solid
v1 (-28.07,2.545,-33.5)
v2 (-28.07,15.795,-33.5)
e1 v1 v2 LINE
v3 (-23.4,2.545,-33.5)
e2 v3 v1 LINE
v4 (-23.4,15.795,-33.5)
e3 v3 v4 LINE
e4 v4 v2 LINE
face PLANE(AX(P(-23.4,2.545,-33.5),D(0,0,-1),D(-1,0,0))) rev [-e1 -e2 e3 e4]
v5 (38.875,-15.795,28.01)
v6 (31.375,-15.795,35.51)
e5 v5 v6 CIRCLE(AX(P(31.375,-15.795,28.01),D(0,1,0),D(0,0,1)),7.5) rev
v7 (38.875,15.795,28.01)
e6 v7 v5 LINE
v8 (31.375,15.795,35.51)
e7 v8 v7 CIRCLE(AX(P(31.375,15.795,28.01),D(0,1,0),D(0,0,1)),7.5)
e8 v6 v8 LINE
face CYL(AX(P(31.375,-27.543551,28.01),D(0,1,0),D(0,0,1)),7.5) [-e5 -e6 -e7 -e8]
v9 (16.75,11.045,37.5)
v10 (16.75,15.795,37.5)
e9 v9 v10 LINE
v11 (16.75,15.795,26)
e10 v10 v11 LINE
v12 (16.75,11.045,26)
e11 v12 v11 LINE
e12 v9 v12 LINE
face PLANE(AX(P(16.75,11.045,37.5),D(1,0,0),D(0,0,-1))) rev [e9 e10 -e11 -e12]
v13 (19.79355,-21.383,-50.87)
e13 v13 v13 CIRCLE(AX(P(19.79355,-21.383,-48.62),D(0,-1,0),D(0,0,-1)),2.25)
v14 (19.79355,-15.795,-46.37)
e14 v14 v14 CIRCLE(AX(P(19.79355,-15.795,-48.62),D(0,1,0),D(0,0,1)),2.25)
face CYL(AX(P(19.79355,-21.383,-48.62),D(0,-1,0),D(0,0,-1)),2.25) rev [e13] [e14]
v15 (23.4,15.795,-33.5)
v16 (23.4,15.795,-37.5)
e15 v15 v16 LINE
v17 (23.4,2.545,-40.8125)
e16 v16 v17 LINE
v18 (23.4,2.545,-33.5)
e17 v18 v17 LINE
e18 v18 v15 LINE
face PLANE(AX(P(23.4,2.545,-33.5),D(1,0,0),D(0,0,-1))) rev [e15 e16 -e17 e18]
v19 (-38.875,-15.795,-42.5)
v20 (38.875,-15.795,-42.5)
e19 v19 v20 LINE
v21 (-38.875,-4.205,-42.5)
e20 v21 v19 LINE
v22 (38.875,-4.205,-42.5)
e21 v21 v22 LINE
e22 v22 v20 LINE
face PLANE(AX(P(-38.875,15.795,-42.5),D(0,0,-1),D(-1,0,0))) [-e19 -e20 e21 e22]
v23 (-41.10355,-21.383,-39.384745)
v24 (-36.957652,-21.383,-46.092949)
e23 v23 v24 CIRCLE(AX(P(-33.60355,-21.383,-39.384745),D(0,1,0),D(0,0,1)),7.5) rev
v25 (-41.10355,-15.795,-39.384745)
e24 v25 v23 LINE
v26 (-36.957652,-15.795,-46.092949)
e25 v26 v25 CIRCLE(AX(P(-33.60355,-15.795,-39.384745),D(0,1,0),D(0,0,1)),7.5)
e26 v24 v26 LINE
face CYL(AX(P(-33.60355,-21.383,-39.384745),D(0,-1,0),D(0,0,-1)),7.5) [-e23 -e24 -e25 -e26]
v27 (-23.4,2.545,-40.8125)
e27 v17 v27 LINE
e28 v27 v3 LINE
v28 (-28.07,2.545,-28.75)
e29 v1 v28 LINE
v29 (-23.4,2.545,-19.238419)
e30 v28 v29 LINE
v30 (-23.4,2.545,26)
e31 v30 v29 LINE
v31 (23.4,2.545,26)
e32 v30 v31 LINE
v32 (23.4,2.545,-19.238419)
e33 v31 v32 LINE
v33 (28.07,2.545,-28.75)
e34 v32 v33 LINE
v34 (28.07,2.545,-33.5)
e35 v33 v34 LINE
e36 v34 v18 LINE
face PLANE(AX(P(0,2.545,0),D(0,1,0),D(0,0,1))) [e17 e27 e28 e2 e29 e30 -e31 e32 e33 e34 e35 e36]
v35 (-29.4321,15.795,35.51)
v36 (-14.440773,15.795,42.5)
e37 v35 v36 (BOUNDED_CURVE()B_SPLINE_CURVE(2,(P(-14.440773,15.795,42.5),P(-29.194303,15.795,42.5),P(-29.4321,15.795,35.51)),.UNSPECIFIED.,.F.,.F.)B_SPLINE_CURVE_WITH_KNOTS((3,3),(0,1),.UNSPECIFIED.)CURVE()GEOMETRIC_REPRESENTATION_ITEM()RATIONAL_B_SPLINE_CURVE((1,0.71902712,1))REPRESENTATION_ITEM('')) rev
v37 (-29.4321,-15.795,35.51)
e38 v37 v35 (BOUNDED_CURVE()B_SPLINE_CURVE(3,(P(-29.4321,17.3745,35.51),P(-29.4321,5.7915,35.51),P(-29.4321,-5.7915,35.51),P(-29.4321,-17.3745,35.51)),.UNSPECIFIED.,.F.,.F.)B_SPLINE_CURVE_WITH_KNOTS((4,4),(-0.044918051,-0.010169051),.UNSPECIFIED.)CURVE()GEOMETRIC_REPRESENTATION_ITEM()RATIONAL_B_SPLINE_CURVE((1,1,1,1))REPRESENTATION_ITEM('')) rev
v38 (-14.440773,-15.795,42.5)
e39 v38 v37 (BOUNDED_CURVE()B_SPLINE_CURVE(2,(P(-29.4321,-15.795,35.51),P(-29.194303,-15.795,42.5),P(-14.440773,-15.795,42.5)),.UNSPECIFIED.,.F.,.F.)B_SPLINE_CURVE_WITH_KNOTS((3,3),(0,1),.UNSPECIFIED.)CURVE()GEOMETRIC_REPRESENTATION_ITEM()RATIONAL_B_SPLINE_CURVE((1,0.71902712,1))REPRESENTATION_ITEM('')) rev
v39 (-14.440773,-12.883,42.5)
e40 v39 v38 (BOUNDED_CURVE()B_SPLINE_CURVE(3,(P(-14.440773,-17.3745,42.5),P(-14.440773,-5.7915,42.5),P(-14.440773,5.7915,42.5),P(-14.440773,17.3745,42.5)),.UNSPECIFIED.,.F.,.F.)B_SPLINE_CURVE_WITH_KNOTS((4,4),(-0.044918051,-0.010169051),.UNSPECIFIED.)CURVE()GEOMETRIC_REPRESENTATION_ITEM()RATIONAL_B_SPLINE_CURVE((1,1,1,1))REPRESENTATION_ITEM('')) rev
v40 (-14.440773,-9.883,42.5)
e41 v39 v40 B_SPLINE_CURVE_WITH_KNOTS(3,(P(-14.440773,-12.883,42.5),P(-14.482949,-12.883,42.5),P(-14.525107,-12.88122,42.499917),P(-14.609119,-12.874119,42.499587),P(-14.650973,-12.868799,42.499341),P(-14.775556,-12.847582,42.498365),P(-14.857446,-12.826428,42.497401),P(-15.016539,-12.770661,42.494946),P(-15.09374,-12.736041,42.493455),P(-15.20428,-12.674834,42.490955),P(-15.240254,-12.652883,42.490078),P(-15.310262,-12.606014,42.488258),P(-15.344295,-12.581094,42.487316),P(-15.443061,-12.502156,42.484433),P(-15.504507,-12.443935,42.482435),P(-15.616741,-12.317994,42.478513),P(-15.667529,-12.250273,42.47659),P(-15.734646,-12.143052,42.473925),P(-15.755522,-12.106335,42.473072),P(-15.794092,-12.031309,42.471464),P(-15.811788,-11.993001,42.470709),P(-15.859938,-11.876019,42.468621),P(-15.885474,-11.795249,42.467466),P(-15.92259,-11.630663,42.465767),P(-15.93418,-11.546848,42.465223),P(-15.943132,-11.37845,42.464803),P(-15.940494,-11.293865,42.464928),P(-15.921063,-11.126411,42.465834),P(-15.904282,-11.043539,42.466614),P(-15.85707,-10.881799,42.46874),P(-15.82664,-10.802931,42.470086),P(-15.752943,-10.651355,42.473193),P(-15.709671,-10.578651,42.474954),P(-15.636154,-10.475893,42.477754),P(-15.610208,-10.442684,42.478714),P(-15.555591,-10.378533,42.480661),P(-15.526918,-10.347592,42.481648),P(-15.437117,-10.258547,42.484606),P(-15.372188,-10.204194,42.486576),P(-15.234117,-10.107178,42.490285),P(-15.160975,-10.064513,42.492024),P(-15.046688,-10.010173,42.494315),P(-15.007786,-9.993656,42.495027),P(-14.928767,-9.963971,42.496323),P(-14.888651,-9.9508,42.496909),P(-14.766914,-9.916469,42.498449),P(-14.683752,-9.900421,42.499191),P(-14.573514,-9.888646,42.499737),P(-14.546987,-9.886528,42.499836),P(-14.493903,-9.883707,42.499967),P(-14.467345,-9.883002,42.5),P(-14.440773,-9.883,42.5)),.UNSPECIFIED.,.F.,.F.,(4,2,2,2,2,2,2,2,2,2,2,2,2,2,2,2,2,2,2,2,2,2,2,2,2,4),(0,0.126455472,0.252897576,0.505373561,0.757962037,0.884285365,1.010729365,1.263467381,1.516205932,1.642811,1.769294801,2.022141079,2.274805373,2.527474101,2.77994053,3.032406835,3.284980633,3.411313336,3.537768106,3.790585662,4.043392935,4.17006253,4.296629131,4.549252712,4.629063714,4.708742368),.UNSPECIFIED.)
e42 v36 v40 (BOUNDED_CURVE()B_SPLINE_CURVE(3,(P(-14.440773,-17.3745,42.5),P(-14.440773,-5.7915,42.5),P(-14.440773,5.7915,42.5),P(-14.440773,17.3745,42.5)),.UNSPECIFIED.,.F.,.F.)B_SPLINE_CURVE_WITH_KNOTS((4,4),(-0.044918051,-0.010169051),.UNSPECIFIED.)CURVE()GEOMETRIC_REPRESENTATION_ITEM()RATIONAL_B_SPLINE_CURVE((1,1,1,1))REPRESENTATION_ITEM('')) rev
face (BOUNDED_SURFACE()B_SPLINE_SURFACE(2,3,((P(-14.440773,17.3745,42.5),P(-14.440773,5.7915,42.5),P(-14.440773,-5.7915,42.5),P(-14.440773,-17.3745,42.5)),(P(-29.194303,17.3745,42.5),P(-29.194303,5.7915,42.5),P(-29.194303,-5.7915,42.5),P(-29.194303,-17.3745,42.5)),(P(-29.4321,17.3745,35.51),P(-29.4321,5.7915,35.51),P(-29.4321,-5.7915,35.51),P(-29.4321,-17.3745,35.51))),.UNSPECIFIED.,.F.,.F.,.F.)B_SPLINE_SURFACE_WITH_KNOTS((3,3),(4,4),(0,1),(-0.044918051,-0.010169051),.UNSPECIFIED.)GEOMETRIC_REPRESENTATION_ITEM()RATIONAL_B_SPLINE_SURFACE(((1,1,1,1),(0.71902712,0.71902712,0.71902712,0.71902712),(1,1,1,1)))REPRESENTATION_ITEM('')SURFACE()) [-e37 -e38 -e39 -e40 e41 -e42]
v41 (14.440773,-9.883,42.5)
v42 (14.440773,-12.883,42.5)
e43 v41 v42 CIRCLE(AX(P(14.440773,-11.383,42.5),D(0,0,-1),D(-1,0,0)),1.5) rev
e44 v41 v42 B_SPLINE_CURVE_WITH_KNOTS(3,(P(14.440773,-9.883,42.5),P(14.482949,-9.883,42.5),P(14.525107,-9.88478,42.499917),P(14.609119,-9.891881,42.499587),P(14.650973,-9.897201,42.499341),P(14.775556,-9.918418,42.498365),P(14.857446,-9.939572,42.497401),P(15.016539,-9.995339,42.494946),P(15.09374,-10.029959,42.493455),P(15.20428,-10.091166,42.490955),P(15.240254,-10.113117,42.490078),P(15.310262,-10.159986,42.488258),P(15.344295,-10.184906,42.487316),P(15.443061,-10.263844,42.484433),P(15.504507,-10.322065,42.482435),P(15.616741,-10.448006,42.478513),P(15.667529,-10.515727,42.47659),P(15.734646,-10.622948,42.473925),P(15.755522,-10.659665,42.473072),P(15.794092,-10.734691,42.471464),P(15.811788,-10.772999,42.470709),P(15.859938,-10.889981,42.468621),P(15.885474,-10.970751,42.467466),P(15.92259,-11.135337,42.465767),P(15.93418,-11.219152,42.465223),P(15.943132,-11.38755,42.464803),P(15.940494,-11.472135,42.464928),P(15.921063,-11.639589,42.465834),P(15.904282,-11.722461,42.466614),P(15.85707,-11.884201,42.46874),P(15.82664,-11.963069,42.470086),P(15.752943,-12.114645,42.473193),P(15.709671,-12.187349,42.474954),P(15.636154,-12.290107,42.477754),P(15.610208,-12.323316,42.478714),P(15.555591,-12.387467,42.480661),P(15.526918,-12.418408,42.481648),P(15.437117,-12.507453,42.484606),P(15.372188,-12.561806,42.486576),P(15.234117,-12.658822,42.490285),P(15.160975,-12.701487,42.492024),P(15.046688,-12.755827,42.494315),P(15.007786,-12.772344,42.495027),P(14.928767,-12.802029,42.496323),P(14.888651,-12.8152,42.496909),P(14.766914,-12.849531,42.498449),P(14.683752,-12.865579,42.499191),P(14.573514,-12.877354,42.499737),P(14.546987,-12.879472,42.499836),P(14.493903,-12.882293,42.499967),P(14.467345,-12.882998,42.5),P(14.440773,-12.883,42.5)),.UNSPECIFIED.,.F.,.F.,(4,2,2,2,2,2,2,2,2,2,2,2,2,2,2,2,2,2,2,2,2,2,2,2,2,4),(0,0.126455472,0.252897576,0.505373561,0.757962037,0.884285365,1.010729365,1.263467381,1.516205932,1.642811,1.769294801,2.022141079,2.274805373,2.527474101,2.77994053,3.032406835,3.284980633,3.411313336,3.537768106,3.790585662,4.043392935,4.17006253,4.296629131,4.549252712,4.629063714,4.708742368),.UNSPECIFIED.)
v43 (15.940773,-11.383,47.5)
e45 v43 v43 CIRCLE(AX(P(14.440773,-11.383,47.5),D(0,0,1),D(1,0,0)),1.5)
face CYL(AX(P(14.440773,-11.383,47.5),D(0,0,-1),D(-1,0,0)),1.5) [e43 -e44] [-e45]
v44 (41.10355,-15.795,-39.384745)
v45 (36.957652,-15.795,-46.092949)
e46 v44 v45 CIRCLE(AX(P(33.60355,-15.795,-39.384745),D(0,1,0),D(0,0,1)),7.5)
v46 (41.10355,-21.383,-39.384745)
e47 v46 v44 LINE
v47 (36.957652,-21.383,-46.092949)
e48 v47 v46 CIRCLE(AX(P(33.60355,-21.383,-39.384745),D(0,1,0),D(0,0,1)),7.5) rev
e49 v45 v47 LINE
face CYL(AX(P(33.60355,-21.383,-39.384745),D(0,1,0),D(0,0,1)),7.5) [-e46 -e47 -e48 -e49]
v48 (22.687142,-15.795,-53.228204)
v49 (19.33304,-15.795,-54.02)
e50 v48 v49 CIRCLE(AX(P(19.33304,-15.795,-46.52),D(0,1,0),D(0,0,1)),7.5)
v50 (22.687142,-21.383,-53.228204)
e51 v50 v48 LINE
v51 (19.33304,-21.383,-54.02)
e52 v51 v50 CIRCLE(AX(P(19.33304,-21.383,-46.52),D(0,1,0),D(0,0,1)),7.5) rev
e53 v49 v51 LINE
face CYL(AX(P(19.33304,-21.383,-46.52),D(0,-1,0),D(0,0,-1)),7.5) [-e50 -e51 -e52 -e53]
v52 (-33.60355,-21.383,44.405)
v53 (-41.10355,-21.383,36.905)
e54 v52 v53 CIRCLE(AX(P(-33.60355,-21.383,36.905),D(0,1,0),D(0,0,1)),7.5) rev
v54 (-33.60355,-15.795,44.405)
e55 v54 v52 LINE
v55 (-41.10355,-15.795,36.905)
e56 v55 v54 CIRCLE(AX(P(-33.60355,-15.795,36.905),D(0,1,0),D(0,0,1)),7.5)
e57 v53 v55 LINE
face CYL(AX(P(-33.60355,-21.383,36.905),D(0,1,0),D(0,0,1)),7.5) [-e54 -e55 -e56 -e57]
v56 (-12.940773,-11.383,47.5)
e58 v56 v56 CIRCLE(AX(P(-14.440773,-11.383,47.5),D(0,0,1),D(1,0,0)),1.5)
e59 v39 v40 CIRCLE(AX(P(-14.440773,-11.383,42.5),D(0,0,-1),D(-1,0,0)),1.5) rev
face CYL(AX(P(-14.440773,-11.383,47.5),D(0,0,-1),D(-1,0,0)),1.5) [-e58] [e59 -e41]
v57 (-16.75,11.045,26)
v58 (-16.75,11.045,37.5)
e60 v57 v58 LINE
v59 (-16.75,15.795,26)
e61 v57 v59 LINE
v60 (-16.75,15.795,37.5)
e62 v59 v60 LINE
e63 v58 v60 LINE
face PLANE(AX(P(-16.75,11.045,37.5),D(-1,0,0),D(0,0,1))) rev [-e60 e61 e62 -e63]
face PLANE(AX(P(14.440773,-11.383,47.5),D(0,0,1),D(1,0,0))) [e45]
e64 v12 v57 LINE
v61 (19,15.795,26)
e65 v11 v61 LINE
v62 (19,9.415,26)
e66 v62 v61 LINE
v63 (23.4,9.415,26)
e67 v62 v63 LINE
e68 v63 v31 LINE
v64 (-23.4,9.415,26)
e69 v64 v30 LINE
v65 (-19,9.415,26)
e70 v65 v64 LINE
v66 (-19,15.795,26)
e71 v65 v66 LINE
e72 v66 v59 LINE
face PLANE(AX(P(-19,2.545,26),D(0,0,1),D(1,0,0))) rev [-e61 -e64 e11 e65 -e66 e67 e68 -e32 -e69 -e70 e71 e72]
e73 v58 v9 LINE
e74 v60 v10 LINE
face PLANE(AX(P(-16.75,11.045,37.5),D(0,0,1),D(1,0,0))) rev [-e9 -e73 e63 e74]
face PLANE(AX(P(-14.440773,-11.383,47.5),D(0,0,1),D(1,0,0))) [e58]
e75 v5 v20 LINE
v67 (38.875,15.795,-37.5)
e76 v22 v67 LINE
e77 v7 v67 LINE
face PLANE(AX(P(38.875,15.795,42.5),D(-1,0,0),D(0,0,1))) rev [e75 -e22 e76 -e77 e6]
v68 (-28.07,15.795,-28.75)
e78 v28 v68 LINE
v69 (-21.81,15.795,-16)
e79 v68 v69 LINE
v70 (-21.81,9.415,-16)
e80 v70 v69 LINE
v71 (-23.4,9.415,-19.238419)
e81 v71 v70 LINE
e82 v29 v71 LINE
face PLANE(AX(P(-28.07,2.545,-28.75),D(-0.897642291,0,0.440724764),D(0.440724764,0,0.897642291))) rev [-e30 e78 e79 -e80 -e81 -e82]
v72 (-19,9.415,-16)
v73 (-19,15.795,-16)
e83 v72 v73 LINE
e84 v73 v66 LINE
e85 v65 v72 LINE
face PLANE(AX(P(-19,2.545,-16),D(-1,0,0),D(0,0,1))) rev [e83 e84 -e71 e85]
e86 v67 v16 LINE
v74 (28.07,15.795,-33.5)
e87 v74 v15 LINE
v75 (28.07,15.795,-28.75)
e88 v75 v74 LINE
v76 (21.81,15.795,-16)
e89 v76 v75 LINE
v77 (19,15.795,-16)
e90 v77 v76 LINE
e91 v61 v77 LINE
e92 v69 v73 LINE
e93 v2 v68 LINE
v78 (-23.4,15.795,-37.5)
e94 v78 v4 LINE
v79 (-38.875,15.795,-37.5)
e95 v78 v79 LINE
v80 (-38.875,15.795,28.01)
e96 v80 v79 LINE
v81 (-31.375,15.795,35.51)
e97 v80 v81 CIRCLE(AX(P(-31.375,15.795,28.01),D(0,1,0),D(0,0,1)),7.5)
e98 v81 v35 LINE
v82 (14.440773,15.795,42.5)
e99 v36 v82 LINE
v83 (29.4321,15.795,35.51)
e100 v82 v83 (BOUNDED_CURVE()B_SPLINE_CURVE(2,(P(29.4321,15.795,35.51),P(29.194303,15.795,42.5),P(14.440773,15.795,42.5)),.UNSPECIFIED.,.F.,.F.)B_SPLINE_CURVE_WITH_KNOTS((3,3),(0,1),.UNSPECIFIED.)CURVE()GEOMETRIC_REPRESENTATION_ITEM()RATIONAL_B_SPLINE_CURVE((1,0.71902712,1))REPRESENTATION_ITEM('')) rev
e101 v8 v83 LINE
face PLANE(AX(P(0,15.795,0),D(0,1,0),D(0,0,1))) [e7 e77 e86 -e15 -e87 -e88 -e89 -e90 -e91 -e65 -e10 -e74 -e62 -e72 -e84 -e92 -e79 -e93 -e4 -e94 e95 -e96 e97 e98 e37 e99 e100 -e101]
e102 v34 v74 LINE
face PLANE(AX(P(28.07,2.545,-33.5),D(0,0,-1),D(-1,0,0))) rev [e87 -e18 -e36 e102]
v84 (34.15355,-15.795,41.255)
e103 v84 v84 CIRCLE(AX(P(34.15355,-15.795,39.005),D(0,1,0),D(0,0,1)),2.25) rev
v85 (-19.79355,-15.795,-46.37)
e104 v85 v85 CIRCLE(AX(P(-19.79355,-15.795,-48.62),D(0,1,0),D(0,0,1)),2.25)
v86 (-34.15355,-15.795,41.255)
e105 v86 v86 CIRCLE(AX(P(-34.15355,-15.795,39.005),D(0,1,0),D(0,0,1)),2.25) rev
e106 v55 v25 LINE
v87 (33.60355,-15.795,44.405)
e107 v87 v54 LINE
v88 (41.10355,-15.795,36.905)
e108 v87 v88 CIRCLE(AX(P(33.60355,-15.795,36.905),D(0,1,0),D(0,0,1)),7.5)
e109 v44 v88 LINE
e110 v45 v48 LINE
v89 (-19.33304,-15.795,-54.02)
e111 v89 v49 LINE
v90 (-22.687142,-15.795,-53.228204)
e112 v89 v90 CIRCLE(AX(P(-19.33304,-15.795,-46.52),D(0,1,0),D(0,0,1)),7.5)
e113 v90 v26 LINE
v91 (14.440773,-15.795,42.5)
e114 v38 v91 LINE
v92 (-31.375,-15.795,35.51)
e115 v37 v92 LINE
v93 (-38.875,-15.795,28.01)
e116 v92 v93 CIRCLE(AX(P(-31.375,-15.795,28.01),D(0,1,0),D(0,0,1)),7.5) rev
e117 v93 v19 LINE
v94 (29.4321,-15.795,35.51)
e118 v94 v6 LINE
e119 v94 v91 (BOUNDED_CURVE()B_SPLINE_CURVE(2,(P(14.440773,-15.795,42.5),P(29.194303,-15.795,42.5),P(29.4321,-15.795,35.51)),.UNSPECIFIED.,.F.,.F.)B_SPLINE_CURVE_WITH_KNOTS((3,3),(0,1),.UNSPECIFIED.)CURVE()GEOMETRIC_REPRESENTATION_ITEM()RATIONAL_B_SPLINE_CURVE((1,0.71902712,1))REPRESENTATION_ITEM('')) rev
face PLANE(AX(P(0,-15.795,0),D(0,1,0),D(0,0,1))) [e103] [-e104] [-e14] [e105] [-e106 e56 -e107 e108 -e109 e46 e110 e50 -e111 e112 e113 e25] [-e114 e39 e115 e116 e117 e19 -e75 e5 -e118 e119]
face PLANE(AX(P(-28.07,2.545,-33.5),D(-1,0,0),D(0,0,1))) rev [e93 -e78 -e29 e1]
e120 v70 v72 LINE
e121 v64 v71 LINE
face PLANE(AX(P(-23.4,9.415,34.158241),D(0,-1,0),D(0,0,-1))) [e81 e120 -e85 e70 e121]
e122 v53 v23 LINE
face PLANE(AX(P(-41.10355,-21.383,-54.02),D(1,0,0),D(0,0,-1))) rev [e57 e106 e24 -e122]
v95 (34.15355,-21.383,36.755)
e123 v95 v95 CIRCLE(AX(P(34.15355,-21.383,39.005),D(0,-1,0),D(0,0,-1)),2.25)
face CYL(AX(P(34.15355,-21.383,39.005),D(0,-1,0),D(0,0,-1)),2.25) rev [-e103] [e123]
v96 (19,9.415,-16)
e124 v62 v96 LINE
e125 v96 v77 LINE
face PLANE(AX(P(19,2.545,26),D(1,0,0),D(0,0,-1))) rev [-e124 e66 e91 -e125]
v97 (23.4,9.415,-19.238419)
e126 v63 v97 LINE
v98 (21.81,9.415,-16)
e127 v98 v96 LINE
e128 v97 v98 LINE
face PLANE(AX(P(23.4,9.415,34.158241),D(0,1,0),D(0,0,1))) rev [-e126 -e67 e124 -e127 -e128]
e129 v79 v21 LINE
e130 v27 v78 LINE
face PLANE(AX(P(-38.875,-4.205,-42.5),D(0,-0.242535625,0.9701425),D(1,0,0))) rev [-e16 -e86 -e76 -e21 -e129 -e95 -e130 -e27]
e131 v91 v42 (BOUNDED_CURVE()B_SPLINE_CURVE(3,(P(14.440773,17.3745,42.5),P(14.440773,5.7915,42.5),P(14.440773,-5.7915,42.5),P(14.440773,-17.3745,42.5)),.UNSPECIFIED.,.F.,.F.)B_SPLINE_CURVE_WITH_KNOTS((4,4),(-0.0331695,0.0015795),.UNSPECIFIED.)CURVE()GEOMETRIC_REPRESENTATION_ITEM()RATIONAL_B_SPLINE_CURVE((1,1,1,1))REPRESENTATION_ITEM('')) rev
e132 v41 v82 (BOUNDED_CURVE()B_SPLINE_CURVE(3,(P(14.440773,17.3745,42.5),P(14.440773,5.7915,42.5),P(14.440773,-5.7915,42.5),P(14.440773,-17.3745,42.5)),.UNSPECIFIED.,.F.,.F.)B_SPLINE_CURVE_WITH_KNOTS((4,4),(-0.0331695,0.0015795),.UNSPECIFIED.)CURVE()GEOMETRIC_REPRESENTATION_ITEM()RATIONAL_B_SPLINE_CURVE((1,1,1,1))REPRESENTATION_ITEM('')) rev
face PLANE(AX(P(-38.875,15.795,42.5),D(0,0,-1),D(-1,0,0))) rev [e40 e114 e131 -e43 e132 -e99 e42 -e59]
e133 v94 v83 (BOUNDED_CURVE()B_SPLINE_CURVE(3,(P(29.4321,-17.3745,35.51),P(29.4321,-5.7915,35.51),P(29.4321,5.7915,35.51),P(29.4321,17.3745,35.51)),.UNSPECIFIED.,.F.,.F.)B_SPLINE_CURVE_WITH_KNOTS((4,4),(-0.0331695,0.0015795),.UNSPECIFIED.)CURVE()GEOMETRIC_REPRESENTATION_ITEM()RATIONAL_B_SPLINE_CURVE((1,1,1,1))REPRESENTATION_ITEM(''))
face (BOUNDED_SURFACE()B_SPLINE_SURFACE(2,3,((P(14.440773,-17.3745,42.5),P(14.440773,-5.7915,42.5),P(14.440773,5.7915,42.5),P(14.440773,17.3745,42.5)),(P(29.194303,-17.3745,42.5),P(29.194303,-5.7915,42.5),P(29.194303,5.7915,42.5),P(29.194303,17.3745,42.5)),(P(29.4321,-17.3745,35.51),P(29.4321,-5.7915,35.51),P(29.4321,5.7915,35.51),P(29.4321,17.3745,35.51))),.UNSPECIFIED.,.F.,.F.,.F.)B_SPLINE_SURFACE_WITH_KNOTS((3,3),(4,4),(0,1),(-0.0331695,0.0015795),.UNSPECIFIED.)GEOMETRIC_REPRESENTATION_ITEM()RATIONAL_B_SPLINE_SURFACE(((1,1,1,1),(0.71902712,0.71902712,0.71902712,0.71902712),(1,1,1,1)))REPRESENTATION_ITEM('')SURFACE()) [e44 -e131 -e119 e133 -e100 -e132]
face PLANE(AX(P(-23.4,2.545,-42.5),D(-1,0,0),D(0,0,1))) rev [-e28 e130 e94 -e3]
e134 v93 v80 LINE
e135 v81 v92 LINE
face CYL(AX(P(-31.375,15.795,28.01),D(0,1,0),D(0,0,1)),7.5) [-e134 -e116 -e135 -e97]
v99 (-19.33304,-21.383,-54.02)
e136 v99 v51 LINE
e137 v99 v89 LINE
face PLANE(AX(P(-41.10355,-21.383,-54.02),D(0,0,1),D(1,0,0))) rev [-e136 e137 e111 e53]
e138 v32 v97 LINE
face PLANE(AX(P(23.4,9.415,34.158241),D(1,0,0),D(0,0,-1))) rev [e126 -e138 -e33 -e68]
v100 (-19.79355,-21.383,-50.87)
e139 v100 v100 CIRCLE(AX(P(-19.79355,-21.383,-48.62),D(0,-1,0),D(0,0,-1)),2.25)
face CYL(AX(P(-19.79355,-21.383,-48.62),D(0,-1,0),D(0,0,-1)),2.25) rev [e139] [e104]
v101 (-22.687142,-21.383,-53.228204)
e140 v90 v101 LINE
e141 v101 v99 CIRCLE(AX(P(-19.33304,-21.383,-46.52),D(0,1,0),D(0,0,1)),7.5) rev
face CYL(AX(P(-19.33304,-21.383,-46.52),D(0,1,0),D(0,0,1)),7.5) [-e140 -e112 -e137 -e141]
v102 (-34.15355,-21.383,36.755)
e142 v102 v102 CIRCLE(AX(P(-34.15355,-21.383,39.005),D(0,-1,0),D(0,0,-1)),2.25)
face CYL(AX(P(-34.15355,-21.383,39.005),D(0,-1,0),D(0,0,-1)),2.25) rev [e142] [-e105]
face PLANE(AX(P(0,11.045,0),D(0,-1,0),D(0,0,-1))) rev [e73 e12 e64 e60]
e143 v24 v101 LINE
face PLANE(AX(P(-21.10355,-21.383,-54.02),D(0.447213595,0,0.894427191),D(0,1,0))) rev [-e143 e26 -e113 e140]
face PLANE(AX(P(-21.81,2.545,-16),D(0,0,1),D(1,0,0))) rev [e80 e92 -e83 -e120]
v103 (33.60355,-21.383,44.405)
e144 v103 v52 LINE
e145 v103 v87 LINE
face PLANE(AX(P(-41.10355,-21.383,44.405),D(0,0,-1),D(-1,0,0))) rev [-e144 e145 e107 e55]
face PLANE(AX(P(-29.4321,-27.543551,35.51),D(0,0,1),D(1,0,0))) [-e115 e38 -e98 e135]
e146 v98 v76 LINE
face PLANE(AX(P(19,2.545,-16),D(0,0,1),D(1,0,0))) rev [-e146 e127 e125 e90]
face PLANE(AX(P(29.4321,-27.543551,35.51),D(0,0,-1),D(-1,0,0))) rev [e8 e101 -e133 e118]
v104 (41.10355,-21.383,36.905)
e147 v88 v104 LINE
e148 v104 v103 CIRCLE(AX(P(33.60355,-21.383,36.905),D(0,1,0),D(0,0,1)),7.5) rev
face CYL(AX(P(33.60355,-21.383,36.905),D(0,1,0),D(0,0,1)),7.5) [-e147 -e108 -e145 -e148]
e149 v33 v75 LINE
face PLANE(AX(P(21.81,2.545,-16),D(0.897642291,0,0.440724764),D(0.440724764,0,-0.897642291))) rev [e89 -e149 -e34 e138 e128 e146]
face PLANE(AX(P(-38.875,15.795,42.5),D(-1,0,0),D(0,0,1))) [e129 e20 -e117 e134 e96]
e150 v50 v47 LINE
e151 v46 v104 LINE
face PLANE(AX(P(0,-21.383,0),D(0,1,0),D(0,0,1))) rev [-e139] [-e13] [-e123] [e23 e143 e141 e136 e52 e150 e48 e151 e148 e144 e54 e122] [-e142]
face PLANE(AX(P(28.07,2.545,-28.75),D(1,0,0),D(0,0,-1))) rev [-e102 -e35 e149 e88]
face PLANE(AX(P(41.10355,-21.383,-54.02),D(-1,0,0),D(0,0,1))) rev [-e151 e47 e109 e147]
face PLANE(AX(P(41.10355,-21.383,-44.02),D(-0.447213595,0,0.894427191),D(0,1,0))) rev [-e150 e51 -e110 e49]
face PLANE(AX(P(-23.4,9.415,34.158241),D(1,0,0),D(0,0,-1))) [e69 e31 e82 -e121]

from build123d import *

# Parameters (mm, degrees)
SKETCH1_W            = 77.75
SKETCH1_H            = 85
BOSS_EXTRUDE1_DEPTH  = 15.795
SKETCH2_W            = 82.2071
SKETCH2_H            = 98.425
BOSS_EXTRUDE2_DEPTH  = 5.588
M4_CLEARANCE_HOLE1_D = 4.5
CHAMFER1_SIZE        = 20
CHAMFER1_SIZE2       = 10
CHAMFER2_SIZE        = 10
CHAMFER2_SIZE2       = 20
CUT_EXTRUDE1_DEPTH   = 13.25
SKETCH7_W            = 4.4
SKETCH7_H            = 6.87
CUT_EXTRUDE2_DEPTH   = 68.5
SKETCH9_W            = 33.5
SKETCH9_H            = 11.5
CUT_EXTRUDE3_DEPTH   = 4.75
SKETCH10_W           = 9.4429
SKETCH10_H           = 6.99
CUT_EXTRUDE4_DEPTH   = 31.59
FILLET1_R            = 7.5
FILLET2_START        = -15.795
FILLET2_DEPTH        = 32.795
FILLET3_START        = -15.795
FILLET3_DEPTH        = 32.795
CHAMFER3_SIZE        = 5
CHAMFER3_SIZE2       = 20
SKETCH11_R           = 1.5
BOSS_EXTRUDE3_DEPTH  = 5


with BuildPart() as part:
    # Sketch1 → Boss-Extrude1 (new, symmetric)
    with BuildSketch(Plane(origin=(0, 0, 0), x_dir=(1, 0, 0), z_dir=(0, 1, 0))):
        Rectangle(SKETCH1_W, SKETCH1_H)
    extrude(amount=BOSS_EXTRUDE1_DEPTH, both=True)

    # Sketch2 → Boss-Extrude2 (add)
    with BuildSketch(Plane.XZ.offset(15.795)):
        with Locations((0, -4.8075)):
            Rectangle(SKETCH2_W, SKETCH2_H)
    extrude(amount=BOSS_EXTRUDE2_DEPTH)

    # M4 Clearance Hole1 (through all)
    with Locations(Plane(origin=(0, -21.383, 0), x_dir=(-1, 0, 0), z_dir=(0, -1, 0))):
        with Locations((-19.79355, 48.62), (19.79355, 48.62), (34.15355, -39.005), (-34.15355, -39.005)):
            Hole(M4_CLEARANCE_HOLE1_D / 2)

    # Chamfer1
    chamfer1_edges = [part.edges().sort_by_distance(p)[0] for p in [
        (41.10355, -18.589, -54.02),
    ]]
    chamfer1_side = [part.faces().sort_by_distance(p)[0] for p in [
        (0, -18.589, -54.02),
    ]]
    chamfer(chamfer1_edges, length=CHAMFER1_SIZE, length2=CHAMFER1_SIZE2, reference=chamfer1_side[0])

    # Chamfer2
    chamfer2_edges = [part.edges().sort_by_distance(p)[0] for p in [
        (-41.10355, -18.589, -54.02),
    ]]
    chamfer2_side = [part.faces().sort_by_distance(p)[0] for p in [
        (-41.10355, -18.589, -4.8075),
    ]]
    chamfer(chamfer2_edges, length=CHAMFER2_SIZE, length2=CHAMFER2_SIZE2, reference=chamfer2_side[0])

    # Sketch6 → Cut-Extrude1 (cut)
    with BuildSketch(Plane(origin=(0, 15.795, 0), x_dir=(1, 0, 0), z_dir=(0, 1, 0))):
        Polygon((-23.4, 42.5), (-23.4, 33.5), (-28.07, 33.5), (-28.07, 28.75), (-21.81, 16), (-19, 16), (-19, -26), (19, -26), (19, 16), (21.81, 16), (28.07, 28.75), (28.07, 33.5), (23.4, 33.5), (23.4, 42.5), align=None)
    extrude(amount=-CUT_EXTRUDE1_DEPTH, mode=Mode.SUBTRACT)

    # Sketch7 → Cut-Extrude2 (cut)
    with BuildSketch(Plane(origin=(0, 0, -42.5), x_dir=(-1, 0, 0), z_dir=(0, 0, -1))):
        with Locations((-21.2, 5.98)):
            Rectangle(SKETCH7_W, SKETCH7_H)
    cut_extrude2 = extrude(amount=-CUT_EXTRUDE2_DEPTH, mode=Mode.SUBTRACT)

    # Mirror7: Cut-Extrude2 across plane
    add(cut_extrude2.mirror(Plane(origin=(0, 0, 0), x_dir=(0, 0, 1), z_dir=(1, 0, 0))), mode=Mode.SUBTRACT)

    # Sketch9 → Cut-Extrude3 (cut)
    with BuildSketch(Plane(origin=(0, 15.795, 0), x_dir=(1, 0, 0), z_dir=(0, 1, 0))):
        with Locations((0, -31.75)):
            Rectangle(SKETCH9_W, SKETCH9_H)
    extrude(amount=-CUT_EXTRUDE3_DEPTH, mode=Mode.SUBTRACT)

    # Sketch10 → Cut-Extrude4 (cut)
    with BuildSketch(Plane(origin=(0, 15.795, 0), x_dir=(1, 0, 0), z_dir=(0, 1, 0))):
        with Locations((34.15355, -39.005)):
            Rectangle(SKETCH10_W, SKETCH10_H)
    cut_extrude4 = extrude(amount=-CUT_EXTRUDE4_DEPTH, mode=Mode.SUBTRACT)

    # Mirror8: Cut-Extrude4 across plane
    add(cut_extrude4.mirror(Plane(origin=(0, 0, 0), x_dir=(0, 0, 1), z_dir=(1, 0, 0))), mode=Mode.SUBTRACT)

    # Fillet1
    fillet1_edges = [part.edges().sort_by_distance(p)[0] for p in [
        (41.10355, -18.589, 44.405),
        (-41.10355, -18.589, 44.405),
        (38.875, 0, 35.51),
        (-38.875, 0, 35.51),
        (41.10355, -18.589, -44.02),
        (21.10355, -18.589, -54.02),
        (-21.10355, -18.589, -54.02),
        (-41.10355, -18.589, -44.02),
    ]]
    fillet(fillet1_edges, radius=FILLET1_R)

    # Fillet2: read off the stored shape, not the designer's step
    # Fillet2 outline → Fillet2 (cut)
    with BuildSketch(Plane(origin=(0, 0, 0), x_dir=(1, 0, 0), z_dir=(0, 1, 0)).offset(FILLET2_START)):
        with BuildLine():
            Line((-29.4321, -42.5), (-14.440772507, -42.5))
            add(Edge.make_bspline(
                [(-14.440772507, -42.5), (-29.194302513, -42.5), (-29.4321, -35.51)],
                knots=[0, 0, 0, 1, 1, 1], degree=2, weights=[1, 0.71902712, 1]))
            Line((-29.4321, -35.51), (-29.4321, -42.5))
        make_face()
    extrude(amount=FILLET2_DEPTH, mode=Mode.SUBTRACT)

    # Fillet3: read off the stored shape, not the designer's step
    # Fillet3 outline → Fillet3 (cut)
    with BuildSketch(Plane(origin=(0, 0, 0), x_dir=(1, 0, 0), z_dir=(0, 1, 0)).offset(FILLET3_START)):
        with BuildLine():
            add(Edge.make_bspline(
                [(14.440772507, -42.5), (29.194302513, -42.5), (29.4321, -35.51)],
                knots=[0, 0, 0, 1, 1, 1], degree=2, weights=[1, 0.71902712, 1]))
            Line((14.440772507, -42.5), (29.4321, -42.5))
            Line((29.4321, -42.5), (29.4321, -35.51))
        make_face()
    extrude(amount=FILLET3_DEPTH, mode=Mode.SUBTRACT)

    # Chamfer3
    chamfer3_edges = [part.edges().sort_by_distance(p)[0] for p in [
        (-31.1375, 15.795, -42.5),
    ]]
    chamfer3_side = [part.faces().sort_by_distance(p)[0] for p in [
        (30.40355, 15.795, 34.358042424),
    ]]
    chamfer(chamfer3_edges, length=CHAMFER3_SIZE, length2=CHAMFER3_SIZE2, reference=chamfer3_side[0])

    # Sketch11 → Boss-Extrude3 (add, symmetric)
    with BuildSketch(Plane.XY.offset(42.5)):
        with Locations(Location((-14.440772507, -11.383, 0), (0, 0, 270))):
            Circle(SKETCH11_R)
        with Locations(Location((14.440772507, -11.383, 0), (0, 0, 90))):
            Circle(SKETCH11_R)
    extrude(amount=BOSS_EXTRUDE3_DEPTH, both=True)


solid = part.part
